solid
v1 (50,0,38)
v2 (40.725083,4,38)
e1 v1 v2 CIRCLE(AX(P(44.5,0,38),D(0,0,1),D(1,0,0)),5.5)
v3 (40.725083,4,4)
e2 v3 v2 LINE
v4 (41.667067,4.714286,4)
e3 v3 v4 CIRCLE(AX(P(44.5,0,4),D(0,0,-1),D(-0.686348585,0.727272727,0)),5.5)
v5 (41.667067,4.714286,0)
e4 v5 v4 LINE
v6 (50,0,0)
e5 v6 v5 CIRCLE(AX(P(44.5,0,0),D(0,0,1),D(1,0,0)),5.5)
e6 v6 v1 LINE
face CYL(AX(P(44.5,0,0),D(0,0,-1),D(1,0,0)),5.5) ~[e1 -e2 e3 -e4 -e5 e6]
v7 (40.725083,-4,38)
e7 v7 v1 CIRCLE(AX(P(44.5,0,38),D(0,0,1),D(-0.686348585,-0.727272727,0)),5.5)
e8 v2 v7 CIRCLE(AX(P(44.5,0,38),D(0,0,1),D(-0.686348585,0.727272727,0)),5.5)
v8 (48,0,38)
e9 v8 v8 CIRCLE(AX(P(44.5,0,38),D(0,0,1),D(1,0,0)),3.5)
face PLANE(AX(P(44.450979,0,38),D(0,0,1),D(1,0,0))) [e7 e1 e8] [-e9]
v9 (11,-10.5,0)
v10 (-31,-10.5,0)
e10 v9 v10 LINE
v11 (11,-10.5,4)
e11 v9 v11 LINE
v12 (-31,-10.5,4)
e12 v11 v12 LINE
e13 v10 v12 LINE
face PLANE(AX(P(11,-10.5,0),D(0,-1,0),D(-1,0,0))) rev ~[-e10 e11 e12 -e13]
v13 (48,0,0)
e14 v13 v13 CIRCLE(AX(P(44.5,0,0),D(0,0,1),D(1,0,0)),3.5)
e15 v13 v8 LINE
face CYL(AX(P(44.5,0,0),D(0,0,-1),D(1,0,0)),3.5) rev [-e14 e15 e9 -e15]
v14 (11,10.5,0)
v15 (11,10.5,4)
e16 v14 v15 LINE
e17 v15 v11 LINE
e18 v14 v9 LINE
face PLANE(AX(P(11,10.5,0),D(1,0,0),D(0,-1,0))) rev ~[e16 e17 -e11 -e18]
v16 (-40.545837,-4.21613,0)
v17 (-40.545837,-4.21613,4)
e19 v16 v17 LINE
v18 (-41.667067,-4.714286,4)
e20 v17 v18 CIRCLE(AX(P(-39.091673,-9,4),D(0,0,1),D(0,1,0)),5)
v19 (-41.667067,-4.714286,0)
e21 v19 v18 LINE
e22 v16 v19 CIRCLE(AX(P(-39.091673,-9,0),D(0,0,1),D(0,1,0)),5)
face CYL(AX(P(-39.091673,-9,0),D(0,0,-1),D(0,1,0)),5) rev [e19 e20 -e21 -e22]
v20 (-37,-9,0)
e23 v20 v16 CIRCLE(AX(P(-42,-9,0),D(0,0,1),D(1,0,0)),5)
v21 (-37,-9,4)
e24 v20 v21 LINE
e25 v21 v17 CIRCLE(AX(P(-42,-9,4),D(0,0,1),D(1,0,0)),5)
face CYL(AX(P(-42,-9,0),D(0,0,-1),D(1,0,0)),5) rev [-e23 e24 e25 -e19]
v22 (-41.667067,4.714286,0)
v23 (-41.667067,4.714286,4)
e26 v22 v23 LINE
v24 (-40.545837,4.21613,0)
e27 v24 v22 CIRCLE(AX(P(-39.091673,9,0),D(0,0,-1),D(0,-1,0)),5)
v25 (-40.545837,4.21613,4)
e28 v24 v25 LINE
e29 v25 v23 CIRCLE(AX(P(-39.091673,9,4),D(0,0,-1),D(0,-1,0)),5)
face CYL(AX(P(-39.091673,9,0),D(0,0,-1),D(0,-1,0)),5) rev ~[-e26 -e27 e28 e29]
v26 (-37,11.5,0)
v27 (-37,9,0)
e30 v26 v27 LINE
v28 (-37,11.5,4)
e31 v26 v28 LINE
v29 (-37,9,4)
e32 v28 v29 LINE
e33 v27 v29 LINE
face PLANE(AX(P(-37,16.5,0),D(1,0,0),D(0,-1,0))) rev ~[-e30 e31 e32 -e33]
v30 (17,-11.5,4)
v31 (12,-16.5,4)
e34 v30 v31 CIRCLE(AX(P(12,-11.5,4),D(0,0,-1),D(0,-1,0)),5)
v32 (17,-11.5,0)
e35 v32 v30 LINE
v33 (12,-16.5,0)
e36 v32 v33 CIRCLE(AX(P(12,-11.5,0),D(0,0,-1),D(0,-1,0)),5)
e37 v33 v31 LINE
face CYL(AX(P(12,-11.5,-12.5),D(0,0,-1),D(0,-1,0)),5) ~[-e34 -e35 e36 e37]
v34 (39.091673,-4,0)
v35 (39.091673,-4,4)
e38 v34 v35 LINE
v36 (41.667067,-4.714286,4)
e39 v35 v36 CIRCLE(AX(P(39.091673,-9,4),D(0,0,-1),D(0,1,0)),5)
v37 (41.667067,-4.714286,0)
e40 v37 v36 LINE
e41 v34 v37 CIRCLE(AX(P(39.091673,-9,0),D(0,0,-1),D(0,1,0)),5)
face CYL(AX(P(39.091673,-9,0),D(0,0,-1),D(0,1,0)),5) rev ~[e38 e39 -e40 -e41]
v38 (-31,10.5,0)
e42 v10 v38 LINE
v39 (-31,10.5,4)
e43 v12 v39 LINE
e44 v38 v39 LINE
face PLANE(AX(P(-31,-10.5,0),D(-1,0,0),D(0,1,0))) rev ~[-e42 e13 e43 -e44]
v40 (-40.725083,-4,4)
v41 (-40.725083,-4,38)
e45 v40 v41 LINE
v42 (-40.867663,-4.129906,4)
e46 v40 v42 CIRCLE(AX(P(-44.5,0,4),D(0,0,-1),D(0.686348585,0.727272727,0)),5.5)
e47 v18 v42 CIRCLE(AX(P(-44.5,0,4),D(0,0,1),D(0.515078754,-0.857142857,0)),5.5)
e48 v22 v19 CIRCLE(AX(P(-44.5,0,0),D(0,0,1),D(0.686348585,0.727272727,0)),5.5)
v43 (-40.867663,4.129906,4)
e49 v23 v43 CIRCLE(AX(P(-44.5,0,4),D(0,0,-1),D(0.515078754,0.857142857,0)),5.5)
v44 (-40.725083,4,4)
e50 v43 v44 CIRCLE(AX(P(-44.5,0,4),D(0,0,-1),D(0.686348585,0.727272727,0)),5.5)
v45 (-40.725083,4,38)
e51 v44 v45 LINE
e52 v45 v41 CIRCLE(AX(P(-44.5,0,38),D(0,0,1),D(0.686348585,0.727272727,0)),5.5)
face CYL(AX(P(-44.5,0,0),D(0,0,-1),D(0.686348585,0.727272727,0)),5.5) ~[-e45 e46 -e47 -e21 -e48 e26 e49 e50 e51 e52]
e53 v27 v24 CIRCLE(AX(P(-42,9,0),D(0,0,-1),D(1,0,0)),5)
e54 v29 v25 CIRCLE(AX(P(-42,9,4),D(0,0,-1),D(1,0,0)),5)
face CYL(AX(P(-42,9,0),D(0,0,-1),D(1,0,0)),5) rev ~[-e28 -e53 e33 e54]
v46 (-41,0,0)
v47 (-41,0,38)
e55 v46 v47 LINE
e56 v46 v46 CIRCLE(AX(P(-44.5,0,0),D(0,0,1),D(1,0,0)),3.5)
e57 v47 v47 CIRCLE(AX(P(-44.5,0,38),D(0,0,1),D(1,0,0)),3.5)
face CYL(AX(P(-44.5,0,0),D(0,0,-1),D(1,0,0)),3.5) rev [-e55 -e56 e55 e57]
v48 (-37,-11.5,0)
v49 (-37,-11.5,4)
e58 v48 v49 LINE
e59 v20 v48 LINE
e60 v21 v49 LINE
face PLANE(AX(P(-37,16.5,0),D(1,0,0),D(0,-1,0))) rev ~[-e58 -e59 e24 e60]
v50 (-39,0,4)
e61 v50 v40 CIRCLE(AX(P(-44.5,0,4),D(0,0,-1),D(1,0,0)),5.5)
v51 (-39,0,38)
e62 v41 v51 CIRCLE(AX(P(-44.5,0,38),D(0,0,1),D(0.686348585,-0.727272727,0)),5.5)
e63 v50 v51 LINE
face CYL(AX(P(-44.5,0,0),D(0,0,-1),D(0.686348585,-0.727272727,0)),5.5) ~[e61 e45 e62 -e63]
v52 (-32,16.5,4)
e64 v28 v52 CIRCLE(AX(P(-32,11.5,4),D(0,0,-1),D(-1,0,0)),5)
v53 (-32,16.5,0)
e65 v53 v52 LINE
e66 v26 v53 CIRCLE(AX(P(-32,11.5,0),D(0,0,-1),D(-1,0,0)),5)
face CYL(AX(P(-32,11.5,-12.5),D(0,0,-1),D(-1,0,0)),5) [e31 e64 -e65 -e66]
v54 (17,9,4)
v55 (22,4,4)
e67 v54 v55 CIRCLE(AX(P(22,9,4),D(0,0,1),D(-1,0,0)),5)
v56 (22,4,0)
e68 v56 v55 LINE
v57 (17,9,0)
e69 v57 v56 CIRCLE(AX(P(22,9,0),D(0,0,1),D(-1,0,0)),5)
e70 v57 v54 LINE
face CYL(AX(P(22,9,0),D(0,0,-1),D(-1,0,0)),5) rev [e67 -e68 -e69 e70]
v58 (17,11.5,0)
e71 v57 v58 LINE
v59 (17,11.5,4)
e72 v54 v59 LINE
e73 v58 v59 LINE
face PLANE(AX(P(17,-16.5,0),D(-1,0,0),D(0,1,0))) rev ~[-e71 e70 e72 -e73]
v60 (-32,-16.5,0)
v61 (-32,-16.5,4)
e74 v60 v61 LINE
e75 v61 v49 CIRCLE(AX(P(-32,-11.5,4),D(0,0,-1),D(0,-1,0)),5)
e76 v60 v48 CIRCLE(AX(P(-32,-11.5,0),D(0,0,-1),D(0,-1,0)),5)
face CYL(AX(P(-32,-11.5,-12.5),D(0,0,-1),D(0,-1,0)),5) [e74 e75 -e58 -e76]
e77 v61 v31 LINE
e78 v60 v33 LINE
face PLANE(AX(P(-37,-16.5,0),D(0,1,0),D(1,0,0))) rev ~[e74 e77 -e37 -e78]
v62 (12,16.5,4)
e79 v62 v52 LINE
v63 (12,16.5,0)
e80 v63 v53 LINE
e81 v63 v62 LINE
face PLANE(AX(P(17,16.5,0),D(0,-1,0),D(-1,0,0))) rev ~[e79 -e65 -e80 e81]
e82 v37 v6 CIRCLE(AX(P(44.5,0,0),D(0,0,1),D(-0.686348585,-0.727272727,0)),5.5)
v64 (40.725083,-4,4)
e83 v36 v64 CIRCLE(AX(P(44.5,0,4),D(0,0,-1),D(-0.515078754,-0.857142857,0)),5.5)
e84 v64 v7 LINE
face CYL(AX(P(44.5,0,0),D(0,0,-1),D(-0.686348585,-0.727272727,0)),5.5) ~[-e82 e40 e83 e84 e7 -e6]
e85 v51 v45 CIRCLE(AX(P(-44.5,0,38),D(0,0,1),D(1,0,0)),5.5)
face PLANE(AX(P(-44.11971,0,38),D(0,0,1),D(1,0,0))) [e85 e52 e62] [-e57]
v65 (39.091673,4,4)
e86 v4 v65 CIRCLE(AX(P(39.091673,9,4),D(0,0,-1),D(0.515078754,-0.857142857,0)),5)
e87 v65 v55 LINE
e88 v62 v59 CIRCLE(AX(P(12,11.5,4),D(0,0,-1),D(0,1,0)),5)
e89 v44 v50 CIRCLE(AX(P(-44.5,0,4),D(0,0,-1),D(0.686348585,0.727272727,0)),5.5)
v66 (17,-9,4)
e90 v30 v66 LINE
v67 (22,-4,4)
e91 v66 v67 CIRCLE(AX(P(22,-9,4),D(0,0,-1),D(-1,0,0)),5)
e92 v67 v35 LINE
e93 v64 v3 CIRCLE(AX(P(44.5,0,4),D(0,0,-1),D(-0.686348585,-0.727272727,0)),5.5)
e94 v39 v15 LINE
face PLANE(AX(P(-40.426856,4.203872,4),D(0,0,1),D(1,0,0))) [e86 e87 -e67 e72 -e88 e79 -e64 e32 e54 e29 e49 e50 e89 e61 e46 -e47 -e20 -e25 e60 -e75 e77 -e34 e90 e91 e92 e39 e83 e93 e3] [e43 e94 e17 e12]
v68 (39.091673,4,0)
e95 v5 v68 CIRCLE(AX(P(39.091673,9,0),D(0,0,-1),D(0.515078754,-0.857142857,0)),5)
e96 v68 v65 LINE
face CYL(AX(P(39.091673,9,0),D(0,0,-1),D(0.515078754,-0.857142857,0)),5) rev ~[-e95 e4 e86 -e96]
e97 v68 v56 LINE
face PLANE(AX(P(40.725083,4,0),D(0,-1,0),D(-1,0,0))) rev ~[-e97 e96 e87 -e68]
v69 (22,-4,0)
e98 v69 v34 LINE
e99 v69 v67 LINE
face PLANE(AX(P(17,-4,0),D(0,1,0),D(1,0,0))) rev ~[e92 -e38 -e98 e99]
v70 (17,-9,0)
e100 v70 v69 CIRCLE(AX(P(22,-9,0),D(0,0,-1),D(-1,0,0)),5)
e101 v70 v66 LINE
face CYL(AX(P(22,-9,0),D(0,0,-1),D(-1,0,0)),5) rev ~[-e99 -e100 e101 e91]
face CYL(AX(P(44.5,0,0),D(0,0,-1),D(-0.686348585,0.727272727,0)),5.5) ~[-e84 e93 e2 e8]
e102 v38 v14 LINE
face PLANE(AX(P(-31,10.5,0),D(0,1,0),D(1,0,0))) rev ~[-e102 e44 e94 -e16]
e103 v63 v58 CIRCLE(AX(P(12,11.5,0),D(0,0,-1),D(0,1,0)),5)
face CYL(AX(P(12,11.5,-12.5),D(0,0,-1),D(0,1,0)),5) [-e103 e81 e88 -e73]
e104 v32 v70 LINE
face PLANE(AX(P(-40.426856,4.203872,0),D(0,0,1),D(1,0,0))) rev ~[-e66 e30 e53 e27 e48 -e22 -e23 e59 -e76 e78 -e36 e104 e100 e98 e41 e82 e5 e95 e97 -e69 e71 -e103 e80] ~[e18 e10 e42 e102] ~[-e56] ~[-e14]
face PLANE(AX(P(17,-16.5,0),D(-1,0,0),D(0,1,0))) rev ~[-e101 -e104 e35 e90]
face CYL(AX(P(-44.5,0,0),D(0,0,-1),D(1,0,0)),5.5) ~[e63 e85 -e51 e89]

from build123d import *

# Parameters (mm, degrees)
F1_DEPTH    = 4
F0_R        = 3.5
F2_DEPTH    = 38
F0_W        = 6
F0_H        = 8
F3_DEPTH    = 4
F4_T1_DEPTH = 4
F4_T3_DEPTH = 29


# Not quite as in the source:
# - a fillet or chamfer that OpenCascade refuses, or shapes differently, is made with other operations: its cross-section is extruded or revolved along the edge and cut away or added


with BuildPart() as f1:
    # F0 (on Top) → F1 (new body)
    with BuildSketch(Plane.XY):
        with BuildLine():
            ThreePointArc((-40.7250827824, 4), (-39.4496512647, 2.1780674121), (-39, 0))
            ThreePointArc((-39, 0), (-39.4496512647, -2.1780674121), (-40.7250827824, -4))
            Line((-40.7250827824, -4), (-37, -4))
            Line((-37, -4), (-37, 4))
            Line((-37, 4), (-40.7250827824, 4))
        make_face()
    extrude(amount=F1_DEPTH)

    # F0 (on Top) → F2 (join)
    with BuildSketch(Plane.XY):
        with BuildLine():
            ThreePointArc((-40.7250827824, -4), (-39.4496512647, -2.1780674121), (-39, 0))
            ThreePointArc((-39, 0), (-39.4496512647, 2.1780674121), (-40.7250827824, 4))
            ThreePointArc((-40.7250827824, 4), (-50, 0), (-40.7250827824, -4))
        make_face()
        with Locations((-44.5, 0)):
            Circle(F0_R, mode=Mode.SUBTRACT)
    extrude(amount=F2_DEPTH)



with BuildPart() as f1b:
    # F0 (on Top) → F1, piece 2 (new body)
    with BuildSketch(Plane.XY):
        with BuildLine():
            Line((40.7250827824, 4), (17, 4))
            Line((17, 4), (17, -4))
            Line((17, -4), (40.7250827824, -4))
            ThreePointArc((40.7250827824, -4), (39, 0), (40.7250827824, 4))
        make_face()
    extrude(amount=F1_DEPTH)

    # F0 (on Top) → F2, piece 2 (join)
    with BuildSketch(Plane.XY):
        with BuildLine():
            ThreePointArc((50, 0), (46.6780674121, 5.0503487353), (40.7250827824, 4))
            ThreePointArc((40.7250827824, 4), (39, 0), (40.7250827824, -4))
            ThreePointArc((40.7250827824, -4), (46.6780674121, -5.0503487353), (50, 0))
        make_face()
        with Locations((44.5, 0)):
            Circle(F0_R, mode=Mode.SUBTRACT)
    extrude(amount=F2_DEPTH)


with BuildPart() as f1_1:
    add(f1.part)

    add(f1b.part)  # F3 merges F1b
    # F0 (on Top) → F3 (join)
    with BuildSketch(Plane.XY):
        Polygon((-31, -4), (-37, -4), (-37, -16.5), (17, -16.5), (17, -4), (11, -4), (11, -10.5), (-31, -10.5), align=None)
        Polygon((-37, 16.5), (-37, 4), (-31, 4), (-31, 10.5), (11, 10.5), (11, 4), (17, 4), (17, 16.5), align=None)
        with Locations((-34, 0)):
            Rectangle(F0_W, F0_H)
        with Locations((14, 0)):
            Rectangle(F0_W, F0_H)
    extrude(amount=F3_DEPTH)

    # F4: fillet of radius 5 on 12 edges, made by hand

    # F4_s2 → F4_t1 (join)
    with BuildSketch(Plane.XY):
        with BuildLine():
            ThreePointArc((-39.0916730868, 4), (-40.4279792964, 4.1818794417), (-41.667066855, 4.7142857143))
            ThreePointArc((-41.667066855, 4.7142857143), (-41.1768279274, 4.3825252282), (-40.7250827824, 4))
            Line((-40.7250827824, 4), (-39.0916730868, 4))
        make_face()
        with BuildLine():
            ThreePointArc((-37, 9), (-38.4644660941, 5.4644660941), (-42, 4))
            Line((-42, 4), (-37, 4))
            Line((-37, 4), (-37, 9))
        make_face()
        with BuildLine():
            ThreePointArc((-37, -9), (-38.4644660941, -5.4644660941), (-42, -4))
            Line((-42, -4), (-37, -4))
            Line((-37, -4), (-37, -9))
        make_face()
        with BuildLine():
            ThreePointArc((-39.0916730868, -4), (-40.4279792964, -4.1818794417), (-41.667066855, -4.7142857143))
            ThreePointArc((-41.667066855, -4.7142857143), (-41.1768279274, -4.3825252282), (-40.7250827824, -4))
            Line((-40.7250827824, -4), (-39.0916730868, -4))
        make_face()
        with BuildLine():
            ThreePointArc((17, 9), (18.4644660941, 5.4644660941), (22, 4))
            Line((22, 4), (17, 4))
            Line((17, 4), (17, 9))
        make_face()
        with BuildLine():
            ThreePointArc((17, -9), (18.4644660941, -5.4644660941), (22, -4))
            Line((22, -4), (17, -4))
            Line((17, -4), (17, -9))
        make_face()
        with BuildLine():
            ThreePointArc((39.0916730868, -4), (40.4279792964, -4.1818794417), (41.667066855, -4.7142857143))
            ThreePointArc((41.667066855, -4.7142857143), (41.1768279274, -4.3825252282), (40.7250827824, -4))
            Line((40.7250827824, -4), (39.0916730868, -4))
        make_face()
        with BuildLine():
            ThreePointArc((41.667066855, 4.7142857143), (40.4279792964, 4.1818794417), (39.0916730868, 4))
            Line((39.0916730868, 4), (40.7250827824, 4))
            ThreePointArc((40.7250827824, 4), (41.1768279274, 4.3825252282), (41.667066855, 4.7142857143))
        make_face()
    extrude(amount=F4_T1_DEPTH)

    # F4_s4 → F4_t3 (cut)
    with BuildSketch(Plane.XY.offset(-12.5)):
        with BuildLine():
            ThreePointArc((12, 16.5), (15.5355339059, 15.0355339059), (17, 11.5))
            Line((17, 11.5), (17, 16.5))
            Line((17, 16.5), (12, 16.5))
        make_face()
        with BuildLine():
            ThreePointArc((-37, 11.5), (-35.5355339059, 15.0355339059), (-32, 16.5))
            Line((-32, 16.5), (-37, 16.5))
            Line((-37, 16.5), (-37, 11.5))
        make_face()
        with BuildLine():
            ThreePointArc((-32, -16.5), (-35.5355339059, -15.0355339059), (-37, -11.5))
            Line((-37, -11.5), (-37, -16.5))
            Line((-37, -16.5), (-32, -16.5))
        make_face()
        with BuildLine():
            ThreePointArc((12, -16.5), (15.5355339059, -15.0355339059), (17, -11.5))
            Line((17, -11.5), (17, -16.5))
            Line((17, -16.5), (12, -16.5))
        make_face()
    extrude(amount=F4_T3_DEPTH, mode=Mode.SUBTRACT)


solid = f1_1.part
